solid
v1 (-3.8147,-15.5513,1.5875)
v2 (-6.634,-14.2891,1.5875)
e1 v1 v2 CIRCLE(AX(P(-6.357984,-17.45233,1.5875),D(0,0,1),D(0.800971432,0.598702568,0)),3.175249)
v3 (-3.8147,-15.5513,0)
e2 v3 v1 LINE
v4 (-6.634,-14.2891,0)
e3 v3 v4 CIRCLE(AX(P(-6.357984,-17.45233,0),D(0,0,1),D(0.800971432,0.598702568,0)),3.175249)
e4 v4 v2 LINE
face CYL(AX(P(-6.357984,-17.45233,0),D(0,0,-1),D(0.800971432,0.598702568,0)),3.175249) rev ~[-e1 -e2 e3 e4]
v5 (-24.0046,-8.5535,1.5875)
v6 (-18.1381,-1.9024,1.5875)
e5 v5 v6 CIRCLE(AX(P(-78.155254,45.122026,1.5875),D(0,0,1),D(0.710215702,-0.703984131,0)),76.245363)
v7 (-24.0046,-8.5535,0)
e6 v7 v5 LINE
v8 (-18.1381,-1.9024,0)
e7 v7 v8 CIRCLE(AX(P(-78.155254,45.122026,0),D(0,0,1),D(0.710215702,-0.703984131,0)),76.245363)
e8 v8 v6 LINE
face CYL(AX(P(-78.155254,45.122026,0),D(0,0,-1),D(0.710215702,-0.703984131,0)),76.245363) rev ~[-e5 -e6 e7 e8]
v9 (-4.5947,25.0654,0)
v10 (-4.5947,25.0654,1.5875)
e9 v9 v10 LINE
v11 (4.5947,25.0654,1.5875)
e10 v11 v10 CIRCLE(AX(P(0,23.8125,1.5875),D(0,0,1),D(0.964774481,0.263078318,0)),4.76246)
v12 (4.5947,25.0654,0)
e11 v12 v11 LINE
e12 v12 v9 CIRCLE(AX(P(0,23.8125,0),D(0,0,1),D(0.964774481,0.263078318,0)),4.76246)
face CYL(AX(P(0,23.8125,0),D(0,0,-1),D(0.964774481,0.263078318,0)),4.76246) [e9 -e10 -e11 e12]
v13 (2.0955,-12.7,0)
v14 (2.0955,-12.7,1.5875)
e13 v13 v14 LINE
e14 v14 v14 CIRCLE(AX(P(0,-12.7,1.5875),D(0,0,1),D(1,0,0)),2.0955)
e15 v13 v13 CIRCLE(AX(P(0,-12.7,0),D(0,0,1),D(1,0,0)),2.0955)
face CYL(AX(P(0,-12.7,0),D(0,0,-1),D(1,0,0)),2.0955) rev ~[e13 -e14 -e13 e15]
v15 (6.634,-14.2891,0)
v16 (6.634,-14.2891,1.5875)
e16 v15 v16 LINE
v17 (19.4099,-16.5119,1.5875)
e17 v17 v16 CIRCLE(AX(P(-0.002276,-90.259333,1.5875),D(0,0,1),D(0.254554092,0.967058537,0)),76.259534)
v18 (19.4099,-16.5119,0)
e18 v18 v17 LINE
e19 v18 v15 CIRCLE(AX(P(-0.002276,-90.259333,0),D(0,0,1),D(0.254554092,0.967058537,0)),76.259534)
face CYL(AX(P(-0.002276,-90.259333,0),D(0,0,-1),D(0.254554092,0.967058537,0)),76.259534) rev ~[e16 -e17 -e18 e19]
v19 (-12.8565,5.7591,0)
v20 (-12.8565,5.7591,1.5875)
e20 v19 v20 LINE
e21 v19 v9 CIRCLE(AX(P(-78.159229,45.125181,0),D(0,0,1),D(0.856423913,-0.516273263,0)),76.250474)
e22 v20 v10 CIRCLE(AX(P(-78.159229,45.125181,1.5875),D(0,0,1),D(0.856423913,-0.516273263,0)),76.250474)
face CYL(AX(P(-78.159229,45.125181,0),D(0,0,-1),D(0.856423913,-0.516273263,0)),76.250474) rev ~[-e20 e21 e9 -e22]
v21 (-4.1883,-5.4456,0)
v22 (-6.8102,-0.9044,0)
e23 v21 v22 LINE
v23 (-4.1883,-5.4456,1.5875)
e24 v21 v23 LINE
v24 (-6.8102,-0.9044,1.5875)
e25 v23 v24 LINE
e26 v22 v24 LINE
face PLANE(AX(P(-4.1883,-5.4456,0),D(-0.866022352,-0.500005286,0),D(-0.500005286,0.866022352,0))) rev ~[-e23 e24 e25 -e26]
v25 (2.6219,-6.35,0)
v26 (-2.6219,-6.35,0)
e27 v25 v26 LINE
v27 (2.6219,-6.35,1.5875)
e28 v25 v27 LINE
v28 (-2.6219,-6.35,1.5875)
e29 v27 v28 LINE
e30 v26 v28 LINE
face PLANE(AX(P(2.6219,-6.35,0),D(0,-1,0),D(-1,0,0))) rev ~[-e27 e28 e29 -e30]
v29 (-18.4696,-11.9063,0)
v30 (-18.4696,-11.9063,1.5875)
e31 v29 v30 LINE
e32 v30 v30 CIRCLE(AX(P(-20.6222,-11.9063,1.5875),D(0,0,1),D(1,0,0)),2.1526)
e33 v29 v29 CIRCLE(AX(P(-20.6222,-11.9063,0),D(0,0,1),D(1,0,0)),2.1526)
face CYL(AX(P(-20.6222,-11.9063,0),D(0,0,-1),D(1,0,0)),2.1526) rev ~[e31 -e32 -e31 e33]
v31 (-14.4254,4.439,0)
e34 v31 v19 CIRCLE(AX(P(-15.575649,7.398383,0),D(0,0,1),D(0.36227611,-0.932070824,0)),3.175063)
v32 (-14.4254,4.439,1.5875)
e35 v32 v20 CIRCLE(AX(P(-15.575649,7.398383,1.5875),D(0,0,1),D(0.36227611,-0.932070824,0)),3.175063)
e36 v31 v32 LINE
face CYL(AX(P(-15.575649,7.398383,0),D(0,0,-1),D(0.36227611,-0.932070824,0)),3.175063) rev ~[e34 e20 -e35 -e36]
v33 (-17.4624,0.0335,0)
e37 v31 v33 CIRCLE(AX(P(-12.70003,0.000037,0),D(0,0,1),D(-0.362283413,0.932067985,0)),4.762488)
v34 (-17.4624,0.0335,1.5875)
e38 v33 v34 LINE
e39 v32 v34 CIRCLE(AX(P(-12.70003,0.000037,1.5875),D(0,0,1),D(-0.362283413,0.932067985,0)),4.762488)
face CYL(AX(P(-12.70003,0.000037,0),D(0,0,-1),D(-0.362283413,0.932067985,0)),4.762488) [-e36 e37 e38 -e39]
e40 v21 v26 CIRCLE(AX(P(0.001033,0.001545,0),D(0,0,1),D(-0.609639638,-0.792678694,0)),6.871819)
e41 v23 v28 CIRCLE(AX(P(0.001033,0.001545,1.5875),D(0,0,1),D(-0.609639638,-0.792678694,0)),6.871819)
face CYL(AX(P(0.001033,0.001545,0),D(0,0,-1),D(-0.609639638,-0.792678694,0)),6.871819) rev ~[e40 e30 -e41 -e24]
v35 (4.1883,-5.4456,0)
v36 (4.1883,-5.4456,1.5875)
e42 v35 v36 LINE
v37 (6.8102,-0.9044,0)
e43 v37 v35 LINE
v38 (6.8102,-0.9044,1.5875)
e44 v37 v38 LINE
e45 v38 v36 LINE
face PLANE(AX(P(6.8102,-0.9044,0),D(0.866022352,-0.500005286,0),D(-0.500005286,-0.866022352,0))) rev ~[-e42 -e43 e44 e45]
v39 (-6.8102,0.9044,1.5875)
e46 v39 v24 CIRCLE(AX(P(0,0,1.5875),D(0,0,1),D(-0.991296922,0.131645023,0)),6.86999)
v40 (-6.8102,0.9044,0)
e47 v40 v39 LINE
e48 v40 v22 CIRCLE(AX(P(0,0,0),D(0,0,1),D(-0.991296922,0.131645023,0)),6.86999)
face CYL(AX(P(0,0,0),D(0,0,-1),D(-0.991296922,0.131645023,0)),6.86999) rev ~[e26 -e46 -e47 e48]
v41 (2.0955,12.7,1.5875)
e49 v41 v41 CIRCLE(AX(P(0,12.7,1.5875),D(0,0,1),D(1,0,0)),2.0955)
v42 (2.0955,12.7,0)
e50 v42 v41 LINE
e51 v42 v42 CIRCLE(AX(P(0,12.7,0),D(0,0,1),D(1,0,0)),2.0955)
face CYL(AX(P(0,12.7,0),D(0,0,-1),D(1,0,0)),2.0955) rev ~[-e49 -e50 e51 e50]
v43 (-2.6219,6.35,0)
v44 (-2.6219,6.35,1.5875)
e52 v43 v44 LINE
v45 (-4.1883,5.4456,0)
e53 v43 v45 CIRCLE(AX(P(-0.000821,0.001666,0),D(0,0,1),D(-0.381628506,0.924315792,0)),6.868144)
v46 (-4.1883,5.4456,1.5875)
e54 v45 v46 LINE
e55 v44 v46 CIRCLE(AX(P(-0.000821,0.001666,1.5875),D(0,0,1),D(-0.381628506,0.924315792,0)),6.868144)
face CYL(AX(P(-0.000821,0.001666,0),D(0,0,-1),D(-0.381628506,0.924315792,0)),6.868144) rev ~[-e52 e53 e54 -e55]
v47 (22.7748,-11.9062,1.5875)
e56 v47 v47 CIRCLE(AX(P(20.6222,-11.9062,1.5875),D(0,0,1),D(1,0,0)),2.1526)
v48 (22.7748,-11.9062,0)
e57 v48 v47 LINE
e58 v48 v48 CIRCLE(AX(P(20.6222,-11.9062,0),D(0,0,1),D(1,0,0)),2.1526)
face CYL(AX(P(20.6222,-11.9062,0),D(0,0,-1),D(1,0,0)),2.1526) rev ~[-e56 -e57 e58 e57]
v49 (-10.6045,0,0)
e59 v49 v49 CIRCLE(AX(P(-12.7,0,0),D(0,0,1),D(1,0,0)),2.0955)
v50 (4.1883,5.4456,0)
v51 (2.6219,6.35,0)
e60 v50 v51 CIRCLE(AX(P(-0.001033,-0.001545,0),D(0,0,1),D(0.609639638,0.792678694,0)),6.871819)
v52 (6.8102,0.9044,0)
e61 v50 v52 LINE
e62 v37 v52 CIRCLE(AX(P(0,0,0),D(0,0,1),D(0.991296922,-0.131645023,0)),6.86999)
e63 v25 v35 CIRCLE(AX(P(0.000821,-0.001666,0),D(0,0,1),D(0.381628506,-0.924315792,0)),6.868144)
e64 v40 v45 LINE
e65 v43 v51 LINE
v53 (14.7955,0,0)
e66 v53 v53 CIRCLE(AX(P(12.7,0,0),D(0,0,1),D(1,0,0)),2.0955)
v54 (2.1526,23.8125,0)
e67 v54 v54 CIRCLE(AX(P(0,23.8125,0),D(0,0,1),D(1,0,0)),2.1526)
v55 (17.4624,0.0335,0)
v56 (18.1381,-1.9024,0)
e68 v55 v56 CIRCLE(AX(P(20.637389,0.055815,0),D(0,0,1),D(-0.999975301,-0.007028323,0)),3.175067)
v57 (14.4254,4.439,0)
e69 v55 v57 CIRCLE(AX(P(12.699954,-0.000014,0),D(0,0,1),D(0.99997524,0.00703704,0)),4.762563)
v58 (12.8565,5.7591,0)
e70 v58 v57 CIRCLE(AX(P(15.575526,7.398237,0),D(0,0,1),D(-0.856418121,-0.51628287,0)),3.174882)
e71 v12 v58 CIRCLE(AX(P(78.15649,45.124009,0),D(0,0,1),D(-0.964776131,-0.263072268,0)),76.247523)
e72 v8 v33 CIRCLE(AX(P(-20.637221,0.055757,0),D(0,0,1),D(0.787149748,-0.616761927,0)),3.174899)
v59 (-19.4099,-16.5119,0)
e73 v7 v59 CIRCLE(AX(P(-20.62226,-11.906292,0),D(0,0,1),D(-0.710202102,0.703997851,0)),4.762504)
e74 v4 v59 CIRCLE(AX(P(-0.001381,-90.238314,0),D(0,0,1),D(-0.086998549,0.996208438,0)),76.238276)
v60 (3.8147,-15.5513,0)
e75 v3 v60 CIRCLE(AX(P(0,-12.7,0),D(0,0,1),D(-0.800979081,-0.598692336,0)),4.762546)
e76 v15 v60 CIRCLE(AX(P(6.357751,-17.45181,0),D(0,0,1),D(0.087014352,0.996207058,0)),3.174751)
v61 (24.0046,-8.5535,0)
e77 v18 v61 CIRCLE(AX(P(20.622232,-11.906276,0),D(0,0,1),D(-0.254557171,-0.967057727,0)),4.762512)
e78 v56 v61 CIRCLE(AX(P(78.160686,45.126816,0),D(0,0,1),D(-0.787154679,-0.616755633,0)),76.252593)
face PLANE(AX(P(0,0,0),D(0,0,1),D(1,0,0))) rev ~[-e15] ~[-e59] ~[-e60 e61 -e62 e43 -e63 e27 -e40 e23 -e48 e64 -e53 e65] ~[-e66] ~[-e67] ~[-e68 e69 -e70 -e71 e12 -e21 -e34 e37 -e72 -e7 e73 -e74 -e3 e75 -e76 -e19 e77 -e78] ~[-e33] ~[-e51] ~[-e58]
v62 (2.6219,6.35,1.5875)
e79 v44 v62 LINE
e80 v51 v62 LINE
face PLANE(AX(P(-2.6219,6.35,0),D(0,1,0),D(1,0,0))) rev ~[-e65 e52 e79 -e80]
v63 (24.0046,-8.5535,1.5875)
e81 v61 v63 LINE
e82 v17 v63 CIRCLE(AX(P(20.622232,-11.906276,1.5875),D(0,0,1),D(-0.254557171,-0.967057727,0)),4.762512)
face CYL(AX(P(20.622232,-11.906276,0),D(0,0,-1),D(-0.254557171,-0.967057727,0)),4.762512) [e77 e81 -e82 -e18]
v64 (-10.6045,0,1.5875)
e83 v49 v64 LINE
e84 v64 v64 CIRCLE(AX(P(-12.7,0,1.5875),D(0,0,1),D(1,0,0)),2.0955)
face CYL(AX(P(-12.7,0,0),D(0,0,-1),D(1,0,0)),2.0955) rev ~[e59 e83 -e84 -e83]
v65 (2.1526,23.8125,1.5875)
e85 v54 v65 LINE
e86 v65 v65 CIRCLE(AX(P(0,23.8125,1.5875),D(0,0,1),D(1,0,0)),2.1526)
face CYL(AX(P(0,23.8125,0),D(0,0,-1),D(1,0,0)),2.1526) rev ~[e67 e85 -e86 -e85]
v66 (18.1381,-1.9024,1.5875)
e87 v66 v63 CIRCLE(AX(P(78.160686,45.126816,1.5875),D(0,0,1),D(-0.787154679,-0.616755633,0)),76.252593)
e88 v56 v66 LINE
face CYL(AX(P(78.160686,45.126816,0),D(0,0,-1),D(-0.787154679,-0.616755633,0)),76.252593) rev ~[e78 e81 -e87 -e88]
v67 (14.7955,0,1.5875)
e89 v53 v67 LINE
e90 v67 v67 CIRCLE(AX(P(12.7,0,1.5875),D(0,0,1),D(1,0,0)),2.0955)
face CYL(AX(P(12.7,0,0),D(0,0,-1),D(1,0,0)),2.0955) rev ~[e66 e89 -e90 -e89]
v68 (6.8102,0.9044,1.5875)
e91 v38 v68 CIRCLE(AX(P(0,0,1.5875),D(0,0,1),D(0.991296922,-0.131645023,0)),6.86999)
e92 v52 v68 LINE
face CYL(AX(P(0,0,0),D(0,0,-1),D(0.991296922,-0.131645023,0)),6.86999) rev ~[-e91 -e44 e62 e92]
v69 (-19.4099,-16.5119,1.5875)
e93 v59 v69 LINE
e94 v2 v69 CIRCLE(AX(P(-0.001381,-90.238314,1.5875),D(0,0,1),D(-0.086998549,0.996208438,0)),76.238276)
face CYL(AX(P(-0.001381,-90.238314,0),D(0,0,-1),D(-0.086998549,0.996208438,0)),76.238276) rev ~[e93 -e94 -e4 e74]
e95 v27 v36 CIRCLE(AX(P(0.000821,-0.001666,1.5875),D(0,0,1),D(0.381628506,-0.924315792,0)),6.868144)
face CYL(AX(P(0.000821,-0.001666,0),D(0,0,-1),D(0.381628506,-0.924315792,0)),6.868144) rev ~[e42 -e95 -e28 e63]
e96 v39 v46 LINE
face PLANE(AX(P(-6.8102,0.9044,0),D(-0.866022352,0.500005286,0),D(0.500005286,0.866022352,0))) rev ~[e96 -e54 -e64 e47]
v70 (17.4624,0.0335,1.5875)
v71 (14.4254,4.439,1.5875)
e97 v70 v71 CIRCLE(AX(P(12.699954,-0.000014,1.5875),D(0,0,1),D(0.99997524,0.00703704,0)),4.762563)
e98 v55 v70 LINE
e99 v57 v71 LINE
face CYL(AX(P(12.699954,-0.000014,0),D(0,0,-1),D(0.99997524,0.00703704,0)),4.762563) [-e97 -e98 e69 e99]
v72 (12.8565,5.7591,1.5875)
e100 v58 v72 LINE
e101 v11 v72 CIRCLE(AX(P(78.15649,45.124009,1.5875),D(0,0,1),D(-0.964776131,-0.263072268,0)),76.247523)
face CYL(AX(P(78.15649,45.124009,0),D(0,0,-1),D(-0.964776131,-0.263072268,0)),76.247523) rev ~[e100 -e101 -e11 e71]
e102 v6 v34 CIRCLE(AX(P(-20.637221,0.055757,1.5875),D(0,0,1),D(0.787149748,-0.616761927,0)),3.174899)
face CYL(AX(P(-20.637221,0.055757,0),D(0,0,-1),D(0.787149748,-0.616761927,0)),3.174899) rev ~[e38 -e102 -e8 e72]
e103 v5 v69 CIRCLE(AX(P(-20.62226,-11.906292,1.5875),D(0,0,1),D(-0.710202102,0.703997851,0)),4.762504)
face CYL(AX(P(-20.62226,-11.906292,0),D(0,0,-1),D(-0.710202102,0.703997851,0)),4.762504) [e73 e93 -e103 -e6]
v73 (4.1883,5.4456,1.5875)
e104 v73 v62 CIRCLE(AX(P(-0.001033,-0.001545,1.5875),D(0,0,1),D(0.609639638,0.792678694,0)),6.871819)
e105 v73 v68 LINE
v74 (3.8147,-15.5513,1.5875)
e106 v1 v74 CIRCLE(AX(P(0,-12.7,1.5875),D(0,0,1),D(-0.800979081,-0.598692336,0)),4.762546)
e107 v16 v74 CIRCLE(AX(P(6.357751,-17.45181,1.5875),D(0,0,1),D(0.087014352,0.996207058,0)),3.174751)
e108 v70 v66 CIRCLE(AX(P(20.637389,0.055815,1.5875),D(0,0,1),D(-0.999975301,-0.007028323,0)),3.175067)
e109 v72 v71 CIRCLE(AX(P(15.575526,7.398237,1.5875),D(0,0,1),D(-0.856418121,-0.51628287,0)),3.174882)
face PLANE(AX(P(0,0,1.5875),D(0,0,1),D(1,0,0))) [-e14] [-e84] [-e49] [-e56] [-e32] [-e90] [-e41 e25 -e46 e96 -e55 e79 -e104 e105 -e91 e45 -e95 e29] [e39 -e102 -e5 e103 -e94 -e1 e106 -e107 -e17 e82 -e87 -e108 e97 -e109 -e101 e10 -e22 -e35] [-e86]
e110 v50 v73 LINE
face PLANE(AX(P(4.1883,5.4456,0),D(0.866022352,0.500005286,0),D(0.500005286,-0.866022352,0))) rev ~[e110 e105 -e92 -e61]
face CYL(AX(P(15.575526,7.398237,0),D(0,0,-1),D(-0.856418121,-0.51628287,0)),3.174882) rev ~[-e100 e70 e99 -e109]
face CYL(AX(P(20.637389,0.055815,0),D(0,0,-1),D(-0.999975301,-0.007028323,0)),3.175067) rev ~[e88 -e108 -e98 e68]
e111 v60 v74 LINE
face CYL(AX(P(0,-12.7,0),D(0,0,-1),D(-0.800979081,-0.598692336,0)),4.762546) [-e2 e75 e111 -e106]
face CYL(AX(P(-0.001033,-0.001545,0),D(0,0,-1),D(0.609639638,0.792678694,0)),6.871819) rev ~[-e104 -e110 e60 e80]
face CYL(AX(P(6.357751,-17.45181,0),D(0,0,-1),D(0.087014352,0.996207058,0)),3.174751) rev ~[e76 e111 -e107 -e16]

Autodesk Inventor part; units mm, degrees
ref_plane "YZ Plane" through (0, 0, 0) normal (1, 0, 0) x (0, 1, 0)
ref_plane "XZ Plane" through (0, 0, 0) normal (0, 1, 0) x (-1, 0, 0)
ref_plane "XY Plane" through (0, 0, 0) normal (0, 0, 1) x (1, 0, 0)
sketch "VersaHex Adapter Hole" plane through (0, 0, 0) normal (0, 0, 1) x (1, 0, 0)
  line L0 (-2.6931, -2.4859) -> (-0.0712, 2.0554)
  arc A0 (1.4952, 2.9597) -> (-0.0712, 2.0554) centre (4.1171, -3.3903) ccw
  line L1 (1.4952, 2.9597) -> (6.7391, 2.9597)
  arc A1 (8.3055, 2.0554) -> (6.7391, 2.9597) centre (4.1171, -3.3903) ccw
  line L2 (8.3055, 2.0554) -> (10.9274, -2.4859)
  arc A2 (10.9274, -4.2946) -> (10.9274, -2.4859) centre (4.1171, -3.3903) ccw
  line L3 (10.9274, -4.2946) -> (8.3055, -8.8359)
  arc A3 (6.7391, -9.7403) -> (8.3055, -8.8359) centre (4.1171, -3.3903) ccw
  line L4 (6.7391, -9.7403) -> (1.4952, -9.7403)
  arc A4 (-0.0712, -8.8359) -> (1.4952, -9.7403) centre (4.1171, -3.3903) ccw
  line L5 (-0.0712, -8.8359) -> (-2.6931, -4.2946)
  arc A5 (-2.6931, -2.4859) -> (-2.6931, -4.2946) centre (4.1171, -3.3903) ccw
  point P0 (3.8427, -3.1642)
  point P1 (0, 3.175)
  point P2 (0, -3.175)
  point P3 (0, 0)
sketch "Block2" plane through (0, 0, 0) normal (0, 0, 1) x (1, 0, 0)
  line L0 (30.4112, -18.6542) -> (33.0331, -14.1129)
  arc A0 (34.5995, -13.2085) -> (33.0331, -14.1129) centre (37.2214, -19.5585) ccw
  line L1 (34.5995, -13.2085) -> (39.8433, -13.2085)
  arc A1 (41.4097, -14.1129) -> (39.8433, -13.2085) centre (37.2214, -19.5585) ccw
  line L2 (41.4097, -14.1129) -> (44.0316, -18.6542)
  arc A2 (44.0316, -20.4629) -> (44.0316, -18.6542) centre (37.2214, -19.5585) ccw
  line L3 (44.0316, -20.4629) -> (41.4097, -25.0042)
  arc A3 (39.8433, -25.9085) -> (41.4097, -25.0042) centre (37.2214, -19.5585) ccw
  line L4 (39.8433, -25.9085) -> (34.5995, -25.9085)
  arc A4 (33.0331, -25.0042) -> (34.5995, -25.9085) centre (37.2214, -19.5585) ccw
  line L5 (33.0331, -25.0042) -> (30.4112, -20.4629)
  arc A5 (30.4112, -18.6542) -> (30.4112, -20.4629) centre (37.2214, -19.5585) ccw
  point P0 (37.2214, -19.5585)
sketch "Sketch1" plane through (0, 0, 0) normal (0, 0, 1) x (1, 0, 0)
  circle A0 centre (-20.6222, -11.9063) radius 2.1526
  circle A1 centre (20.6222, -11.9062) radius 2.1526
  circle A2 centre (0, 23.8125) radius 2.1526
  arc A3 (-24.0046, -8.5535) -> (-19.4099, -16.5119) centre (-20.6222, -11.9063) ccw
  arc A4 (19.4099, -16.5119) -> (24.0046, -8.5535) centre (20.6222, -11.9062) ccw
  arc A5 (4.5947, 25.0654) -> (-4.5947, 25.0654) centre (0, 23.8125) ccw
  arc A6 (-3.8147, -15.5513) -> (3.8147, -15.5513) centre (0, -12.7) ccw
  arc A7 (19.4099, -16.5119) -> (6.634, -14.2891) centre (0, -90.2489) ccw
  arc A8 (-6.634, -14.2891) -> (-19.4099, -16.5119) centre (0, -90.2489) ccw
  arc A9 (-3.8147, -15.5513) -> (-6.634, -14.2891) centre (-6.3578, -17.4521) ccw
  arc A10 (6.634, -14.2891) -> (3.8147, -15.5513) centre (6.3578, -17.4521) ccw
  circle A11 centre (0, -12.7) radius 2.0955
  circle A12 centre (0, 12.7) radius 2.0955
  circle A13 centre (-12.7, 0) radius 2.0955
  circle A14 centre (12.7, 0) radius 2.0955
  arc A15 (-14.4254, 4.439) -> (-17.4624, 0.0335) centre (-12.7, 0) ccw
  arc A16 (17.4624, 0.0335) -> (14.4254, 4.439) centre (12.7, 0) ccw
  arc A17 (-24.0046, -8.5535) -> (-18.1381, -1.9024) centre (-78.1579, 45.1245) ccw
  arc A18 (-12.8565, 5.7591) -> (-4.5947, 25.0654) centre (-78.1579, 45.1245) ccw
  arc A19 (4.5947, 25.0654) -> (12.8565, 5.7591) centre (78.1579, 45.1245) ccw
  arc A20 (18.1381, -1.9024) -> (24.0046, -8.5535) centre (78.1579, 45.1245) ccw
  arc A21 (-18.1381, -1.9024) -> (-17.4624, 0.0335) centre (-20.6373, 0.0558) ccw
  arc A22 (-14.4254, 4.439) -> (-12.8565, 5.7591) centre (-15.5756, 7.3983) ccw
  arc A23 (12.8565, 5.7591) -> (14.4254, 4.439) centre (15.5756, 7.3983) ccw
  arc A24 (17.4624, 0.0335) -> (18.1381, -1.9024) centre (20.6373, 0.0558) ccw
  line L0 (-6.8102, 0.9044) -> (-4.1883, 5.4456)
  arc A25 (-2.6219, 6.35) -> (-4.1883, 5.4456) centre (0, 0) ccw
  line L1 (-2.6219, 6.35) -> (2.6219, 6.35)
  arc A26 (4.1883, 5.4456) -> (2.6219, 6.35) centre (0, 0) ccw
  line L2 (4.1883, 5.4456) -> (6.8102, 0.9044)
  arc A27 (6.8102, -0.9044) -> (6.8102, 0.9044) centre (0, 0) ccw
  line L3 (6.8102, -0.9044) -> (4.1883, -5.4456)
  arc A28 (2.6219, -6.35) -> (4.1883, -5.4456) centre (0, 0) ccw
  line L4 (2.6219, -6.35) -> (-2.6219, -6.35)
  arc A29 (-4.1883, -5.4456) -> (-2.6219, -6.35) centre (0, 0) ccw
  line L5 (-4.1883, -5.4456) -> (-6.8102, -0.9044)
  arc A30 (-6.8102, 0.9044) -> (-6.8102, -0.9044) centre (0, 0) ccw
  dimension "d5" = 9.525
  dimension "d6" = 9.525
  dimension "d7" = 9.525
  dimension "d8" = 9.525
  dimension "d9" = 3.175
  dimension "d10" = 4.191
  dimension "d11" = 4.191
  dimension "d12" = 4.191
  dimension "d13" = 4.191
  dimension "d14" = 9.525
  dimension "d15" = 9.525
  dimension "d16" = 3.175
extrude "Extrusion1" add sketch "Sketch1" along normal blind 1.5875
equation "\"BendRadius\" = Thickness"
equation "\"BendReliefWidth\" = Thickness"
equation "\"BendReliefDepth\" = 0.5 * Thickness"
equation "\"CornerReliefSize\" = 4 * Thickness"
equation "\"MinimumRemnant\" = 2 * Thickness"
equation "\"TransitionRadius\" = BendRadius"
equation "\"JacobiRadiusSize\" = BendRadius"
equation "\"GapSize\" = Thickness"
equation "\"Thickness\" = 1.5875"
properties part number "drop_center_hub" material "Acetal Resin, White"
